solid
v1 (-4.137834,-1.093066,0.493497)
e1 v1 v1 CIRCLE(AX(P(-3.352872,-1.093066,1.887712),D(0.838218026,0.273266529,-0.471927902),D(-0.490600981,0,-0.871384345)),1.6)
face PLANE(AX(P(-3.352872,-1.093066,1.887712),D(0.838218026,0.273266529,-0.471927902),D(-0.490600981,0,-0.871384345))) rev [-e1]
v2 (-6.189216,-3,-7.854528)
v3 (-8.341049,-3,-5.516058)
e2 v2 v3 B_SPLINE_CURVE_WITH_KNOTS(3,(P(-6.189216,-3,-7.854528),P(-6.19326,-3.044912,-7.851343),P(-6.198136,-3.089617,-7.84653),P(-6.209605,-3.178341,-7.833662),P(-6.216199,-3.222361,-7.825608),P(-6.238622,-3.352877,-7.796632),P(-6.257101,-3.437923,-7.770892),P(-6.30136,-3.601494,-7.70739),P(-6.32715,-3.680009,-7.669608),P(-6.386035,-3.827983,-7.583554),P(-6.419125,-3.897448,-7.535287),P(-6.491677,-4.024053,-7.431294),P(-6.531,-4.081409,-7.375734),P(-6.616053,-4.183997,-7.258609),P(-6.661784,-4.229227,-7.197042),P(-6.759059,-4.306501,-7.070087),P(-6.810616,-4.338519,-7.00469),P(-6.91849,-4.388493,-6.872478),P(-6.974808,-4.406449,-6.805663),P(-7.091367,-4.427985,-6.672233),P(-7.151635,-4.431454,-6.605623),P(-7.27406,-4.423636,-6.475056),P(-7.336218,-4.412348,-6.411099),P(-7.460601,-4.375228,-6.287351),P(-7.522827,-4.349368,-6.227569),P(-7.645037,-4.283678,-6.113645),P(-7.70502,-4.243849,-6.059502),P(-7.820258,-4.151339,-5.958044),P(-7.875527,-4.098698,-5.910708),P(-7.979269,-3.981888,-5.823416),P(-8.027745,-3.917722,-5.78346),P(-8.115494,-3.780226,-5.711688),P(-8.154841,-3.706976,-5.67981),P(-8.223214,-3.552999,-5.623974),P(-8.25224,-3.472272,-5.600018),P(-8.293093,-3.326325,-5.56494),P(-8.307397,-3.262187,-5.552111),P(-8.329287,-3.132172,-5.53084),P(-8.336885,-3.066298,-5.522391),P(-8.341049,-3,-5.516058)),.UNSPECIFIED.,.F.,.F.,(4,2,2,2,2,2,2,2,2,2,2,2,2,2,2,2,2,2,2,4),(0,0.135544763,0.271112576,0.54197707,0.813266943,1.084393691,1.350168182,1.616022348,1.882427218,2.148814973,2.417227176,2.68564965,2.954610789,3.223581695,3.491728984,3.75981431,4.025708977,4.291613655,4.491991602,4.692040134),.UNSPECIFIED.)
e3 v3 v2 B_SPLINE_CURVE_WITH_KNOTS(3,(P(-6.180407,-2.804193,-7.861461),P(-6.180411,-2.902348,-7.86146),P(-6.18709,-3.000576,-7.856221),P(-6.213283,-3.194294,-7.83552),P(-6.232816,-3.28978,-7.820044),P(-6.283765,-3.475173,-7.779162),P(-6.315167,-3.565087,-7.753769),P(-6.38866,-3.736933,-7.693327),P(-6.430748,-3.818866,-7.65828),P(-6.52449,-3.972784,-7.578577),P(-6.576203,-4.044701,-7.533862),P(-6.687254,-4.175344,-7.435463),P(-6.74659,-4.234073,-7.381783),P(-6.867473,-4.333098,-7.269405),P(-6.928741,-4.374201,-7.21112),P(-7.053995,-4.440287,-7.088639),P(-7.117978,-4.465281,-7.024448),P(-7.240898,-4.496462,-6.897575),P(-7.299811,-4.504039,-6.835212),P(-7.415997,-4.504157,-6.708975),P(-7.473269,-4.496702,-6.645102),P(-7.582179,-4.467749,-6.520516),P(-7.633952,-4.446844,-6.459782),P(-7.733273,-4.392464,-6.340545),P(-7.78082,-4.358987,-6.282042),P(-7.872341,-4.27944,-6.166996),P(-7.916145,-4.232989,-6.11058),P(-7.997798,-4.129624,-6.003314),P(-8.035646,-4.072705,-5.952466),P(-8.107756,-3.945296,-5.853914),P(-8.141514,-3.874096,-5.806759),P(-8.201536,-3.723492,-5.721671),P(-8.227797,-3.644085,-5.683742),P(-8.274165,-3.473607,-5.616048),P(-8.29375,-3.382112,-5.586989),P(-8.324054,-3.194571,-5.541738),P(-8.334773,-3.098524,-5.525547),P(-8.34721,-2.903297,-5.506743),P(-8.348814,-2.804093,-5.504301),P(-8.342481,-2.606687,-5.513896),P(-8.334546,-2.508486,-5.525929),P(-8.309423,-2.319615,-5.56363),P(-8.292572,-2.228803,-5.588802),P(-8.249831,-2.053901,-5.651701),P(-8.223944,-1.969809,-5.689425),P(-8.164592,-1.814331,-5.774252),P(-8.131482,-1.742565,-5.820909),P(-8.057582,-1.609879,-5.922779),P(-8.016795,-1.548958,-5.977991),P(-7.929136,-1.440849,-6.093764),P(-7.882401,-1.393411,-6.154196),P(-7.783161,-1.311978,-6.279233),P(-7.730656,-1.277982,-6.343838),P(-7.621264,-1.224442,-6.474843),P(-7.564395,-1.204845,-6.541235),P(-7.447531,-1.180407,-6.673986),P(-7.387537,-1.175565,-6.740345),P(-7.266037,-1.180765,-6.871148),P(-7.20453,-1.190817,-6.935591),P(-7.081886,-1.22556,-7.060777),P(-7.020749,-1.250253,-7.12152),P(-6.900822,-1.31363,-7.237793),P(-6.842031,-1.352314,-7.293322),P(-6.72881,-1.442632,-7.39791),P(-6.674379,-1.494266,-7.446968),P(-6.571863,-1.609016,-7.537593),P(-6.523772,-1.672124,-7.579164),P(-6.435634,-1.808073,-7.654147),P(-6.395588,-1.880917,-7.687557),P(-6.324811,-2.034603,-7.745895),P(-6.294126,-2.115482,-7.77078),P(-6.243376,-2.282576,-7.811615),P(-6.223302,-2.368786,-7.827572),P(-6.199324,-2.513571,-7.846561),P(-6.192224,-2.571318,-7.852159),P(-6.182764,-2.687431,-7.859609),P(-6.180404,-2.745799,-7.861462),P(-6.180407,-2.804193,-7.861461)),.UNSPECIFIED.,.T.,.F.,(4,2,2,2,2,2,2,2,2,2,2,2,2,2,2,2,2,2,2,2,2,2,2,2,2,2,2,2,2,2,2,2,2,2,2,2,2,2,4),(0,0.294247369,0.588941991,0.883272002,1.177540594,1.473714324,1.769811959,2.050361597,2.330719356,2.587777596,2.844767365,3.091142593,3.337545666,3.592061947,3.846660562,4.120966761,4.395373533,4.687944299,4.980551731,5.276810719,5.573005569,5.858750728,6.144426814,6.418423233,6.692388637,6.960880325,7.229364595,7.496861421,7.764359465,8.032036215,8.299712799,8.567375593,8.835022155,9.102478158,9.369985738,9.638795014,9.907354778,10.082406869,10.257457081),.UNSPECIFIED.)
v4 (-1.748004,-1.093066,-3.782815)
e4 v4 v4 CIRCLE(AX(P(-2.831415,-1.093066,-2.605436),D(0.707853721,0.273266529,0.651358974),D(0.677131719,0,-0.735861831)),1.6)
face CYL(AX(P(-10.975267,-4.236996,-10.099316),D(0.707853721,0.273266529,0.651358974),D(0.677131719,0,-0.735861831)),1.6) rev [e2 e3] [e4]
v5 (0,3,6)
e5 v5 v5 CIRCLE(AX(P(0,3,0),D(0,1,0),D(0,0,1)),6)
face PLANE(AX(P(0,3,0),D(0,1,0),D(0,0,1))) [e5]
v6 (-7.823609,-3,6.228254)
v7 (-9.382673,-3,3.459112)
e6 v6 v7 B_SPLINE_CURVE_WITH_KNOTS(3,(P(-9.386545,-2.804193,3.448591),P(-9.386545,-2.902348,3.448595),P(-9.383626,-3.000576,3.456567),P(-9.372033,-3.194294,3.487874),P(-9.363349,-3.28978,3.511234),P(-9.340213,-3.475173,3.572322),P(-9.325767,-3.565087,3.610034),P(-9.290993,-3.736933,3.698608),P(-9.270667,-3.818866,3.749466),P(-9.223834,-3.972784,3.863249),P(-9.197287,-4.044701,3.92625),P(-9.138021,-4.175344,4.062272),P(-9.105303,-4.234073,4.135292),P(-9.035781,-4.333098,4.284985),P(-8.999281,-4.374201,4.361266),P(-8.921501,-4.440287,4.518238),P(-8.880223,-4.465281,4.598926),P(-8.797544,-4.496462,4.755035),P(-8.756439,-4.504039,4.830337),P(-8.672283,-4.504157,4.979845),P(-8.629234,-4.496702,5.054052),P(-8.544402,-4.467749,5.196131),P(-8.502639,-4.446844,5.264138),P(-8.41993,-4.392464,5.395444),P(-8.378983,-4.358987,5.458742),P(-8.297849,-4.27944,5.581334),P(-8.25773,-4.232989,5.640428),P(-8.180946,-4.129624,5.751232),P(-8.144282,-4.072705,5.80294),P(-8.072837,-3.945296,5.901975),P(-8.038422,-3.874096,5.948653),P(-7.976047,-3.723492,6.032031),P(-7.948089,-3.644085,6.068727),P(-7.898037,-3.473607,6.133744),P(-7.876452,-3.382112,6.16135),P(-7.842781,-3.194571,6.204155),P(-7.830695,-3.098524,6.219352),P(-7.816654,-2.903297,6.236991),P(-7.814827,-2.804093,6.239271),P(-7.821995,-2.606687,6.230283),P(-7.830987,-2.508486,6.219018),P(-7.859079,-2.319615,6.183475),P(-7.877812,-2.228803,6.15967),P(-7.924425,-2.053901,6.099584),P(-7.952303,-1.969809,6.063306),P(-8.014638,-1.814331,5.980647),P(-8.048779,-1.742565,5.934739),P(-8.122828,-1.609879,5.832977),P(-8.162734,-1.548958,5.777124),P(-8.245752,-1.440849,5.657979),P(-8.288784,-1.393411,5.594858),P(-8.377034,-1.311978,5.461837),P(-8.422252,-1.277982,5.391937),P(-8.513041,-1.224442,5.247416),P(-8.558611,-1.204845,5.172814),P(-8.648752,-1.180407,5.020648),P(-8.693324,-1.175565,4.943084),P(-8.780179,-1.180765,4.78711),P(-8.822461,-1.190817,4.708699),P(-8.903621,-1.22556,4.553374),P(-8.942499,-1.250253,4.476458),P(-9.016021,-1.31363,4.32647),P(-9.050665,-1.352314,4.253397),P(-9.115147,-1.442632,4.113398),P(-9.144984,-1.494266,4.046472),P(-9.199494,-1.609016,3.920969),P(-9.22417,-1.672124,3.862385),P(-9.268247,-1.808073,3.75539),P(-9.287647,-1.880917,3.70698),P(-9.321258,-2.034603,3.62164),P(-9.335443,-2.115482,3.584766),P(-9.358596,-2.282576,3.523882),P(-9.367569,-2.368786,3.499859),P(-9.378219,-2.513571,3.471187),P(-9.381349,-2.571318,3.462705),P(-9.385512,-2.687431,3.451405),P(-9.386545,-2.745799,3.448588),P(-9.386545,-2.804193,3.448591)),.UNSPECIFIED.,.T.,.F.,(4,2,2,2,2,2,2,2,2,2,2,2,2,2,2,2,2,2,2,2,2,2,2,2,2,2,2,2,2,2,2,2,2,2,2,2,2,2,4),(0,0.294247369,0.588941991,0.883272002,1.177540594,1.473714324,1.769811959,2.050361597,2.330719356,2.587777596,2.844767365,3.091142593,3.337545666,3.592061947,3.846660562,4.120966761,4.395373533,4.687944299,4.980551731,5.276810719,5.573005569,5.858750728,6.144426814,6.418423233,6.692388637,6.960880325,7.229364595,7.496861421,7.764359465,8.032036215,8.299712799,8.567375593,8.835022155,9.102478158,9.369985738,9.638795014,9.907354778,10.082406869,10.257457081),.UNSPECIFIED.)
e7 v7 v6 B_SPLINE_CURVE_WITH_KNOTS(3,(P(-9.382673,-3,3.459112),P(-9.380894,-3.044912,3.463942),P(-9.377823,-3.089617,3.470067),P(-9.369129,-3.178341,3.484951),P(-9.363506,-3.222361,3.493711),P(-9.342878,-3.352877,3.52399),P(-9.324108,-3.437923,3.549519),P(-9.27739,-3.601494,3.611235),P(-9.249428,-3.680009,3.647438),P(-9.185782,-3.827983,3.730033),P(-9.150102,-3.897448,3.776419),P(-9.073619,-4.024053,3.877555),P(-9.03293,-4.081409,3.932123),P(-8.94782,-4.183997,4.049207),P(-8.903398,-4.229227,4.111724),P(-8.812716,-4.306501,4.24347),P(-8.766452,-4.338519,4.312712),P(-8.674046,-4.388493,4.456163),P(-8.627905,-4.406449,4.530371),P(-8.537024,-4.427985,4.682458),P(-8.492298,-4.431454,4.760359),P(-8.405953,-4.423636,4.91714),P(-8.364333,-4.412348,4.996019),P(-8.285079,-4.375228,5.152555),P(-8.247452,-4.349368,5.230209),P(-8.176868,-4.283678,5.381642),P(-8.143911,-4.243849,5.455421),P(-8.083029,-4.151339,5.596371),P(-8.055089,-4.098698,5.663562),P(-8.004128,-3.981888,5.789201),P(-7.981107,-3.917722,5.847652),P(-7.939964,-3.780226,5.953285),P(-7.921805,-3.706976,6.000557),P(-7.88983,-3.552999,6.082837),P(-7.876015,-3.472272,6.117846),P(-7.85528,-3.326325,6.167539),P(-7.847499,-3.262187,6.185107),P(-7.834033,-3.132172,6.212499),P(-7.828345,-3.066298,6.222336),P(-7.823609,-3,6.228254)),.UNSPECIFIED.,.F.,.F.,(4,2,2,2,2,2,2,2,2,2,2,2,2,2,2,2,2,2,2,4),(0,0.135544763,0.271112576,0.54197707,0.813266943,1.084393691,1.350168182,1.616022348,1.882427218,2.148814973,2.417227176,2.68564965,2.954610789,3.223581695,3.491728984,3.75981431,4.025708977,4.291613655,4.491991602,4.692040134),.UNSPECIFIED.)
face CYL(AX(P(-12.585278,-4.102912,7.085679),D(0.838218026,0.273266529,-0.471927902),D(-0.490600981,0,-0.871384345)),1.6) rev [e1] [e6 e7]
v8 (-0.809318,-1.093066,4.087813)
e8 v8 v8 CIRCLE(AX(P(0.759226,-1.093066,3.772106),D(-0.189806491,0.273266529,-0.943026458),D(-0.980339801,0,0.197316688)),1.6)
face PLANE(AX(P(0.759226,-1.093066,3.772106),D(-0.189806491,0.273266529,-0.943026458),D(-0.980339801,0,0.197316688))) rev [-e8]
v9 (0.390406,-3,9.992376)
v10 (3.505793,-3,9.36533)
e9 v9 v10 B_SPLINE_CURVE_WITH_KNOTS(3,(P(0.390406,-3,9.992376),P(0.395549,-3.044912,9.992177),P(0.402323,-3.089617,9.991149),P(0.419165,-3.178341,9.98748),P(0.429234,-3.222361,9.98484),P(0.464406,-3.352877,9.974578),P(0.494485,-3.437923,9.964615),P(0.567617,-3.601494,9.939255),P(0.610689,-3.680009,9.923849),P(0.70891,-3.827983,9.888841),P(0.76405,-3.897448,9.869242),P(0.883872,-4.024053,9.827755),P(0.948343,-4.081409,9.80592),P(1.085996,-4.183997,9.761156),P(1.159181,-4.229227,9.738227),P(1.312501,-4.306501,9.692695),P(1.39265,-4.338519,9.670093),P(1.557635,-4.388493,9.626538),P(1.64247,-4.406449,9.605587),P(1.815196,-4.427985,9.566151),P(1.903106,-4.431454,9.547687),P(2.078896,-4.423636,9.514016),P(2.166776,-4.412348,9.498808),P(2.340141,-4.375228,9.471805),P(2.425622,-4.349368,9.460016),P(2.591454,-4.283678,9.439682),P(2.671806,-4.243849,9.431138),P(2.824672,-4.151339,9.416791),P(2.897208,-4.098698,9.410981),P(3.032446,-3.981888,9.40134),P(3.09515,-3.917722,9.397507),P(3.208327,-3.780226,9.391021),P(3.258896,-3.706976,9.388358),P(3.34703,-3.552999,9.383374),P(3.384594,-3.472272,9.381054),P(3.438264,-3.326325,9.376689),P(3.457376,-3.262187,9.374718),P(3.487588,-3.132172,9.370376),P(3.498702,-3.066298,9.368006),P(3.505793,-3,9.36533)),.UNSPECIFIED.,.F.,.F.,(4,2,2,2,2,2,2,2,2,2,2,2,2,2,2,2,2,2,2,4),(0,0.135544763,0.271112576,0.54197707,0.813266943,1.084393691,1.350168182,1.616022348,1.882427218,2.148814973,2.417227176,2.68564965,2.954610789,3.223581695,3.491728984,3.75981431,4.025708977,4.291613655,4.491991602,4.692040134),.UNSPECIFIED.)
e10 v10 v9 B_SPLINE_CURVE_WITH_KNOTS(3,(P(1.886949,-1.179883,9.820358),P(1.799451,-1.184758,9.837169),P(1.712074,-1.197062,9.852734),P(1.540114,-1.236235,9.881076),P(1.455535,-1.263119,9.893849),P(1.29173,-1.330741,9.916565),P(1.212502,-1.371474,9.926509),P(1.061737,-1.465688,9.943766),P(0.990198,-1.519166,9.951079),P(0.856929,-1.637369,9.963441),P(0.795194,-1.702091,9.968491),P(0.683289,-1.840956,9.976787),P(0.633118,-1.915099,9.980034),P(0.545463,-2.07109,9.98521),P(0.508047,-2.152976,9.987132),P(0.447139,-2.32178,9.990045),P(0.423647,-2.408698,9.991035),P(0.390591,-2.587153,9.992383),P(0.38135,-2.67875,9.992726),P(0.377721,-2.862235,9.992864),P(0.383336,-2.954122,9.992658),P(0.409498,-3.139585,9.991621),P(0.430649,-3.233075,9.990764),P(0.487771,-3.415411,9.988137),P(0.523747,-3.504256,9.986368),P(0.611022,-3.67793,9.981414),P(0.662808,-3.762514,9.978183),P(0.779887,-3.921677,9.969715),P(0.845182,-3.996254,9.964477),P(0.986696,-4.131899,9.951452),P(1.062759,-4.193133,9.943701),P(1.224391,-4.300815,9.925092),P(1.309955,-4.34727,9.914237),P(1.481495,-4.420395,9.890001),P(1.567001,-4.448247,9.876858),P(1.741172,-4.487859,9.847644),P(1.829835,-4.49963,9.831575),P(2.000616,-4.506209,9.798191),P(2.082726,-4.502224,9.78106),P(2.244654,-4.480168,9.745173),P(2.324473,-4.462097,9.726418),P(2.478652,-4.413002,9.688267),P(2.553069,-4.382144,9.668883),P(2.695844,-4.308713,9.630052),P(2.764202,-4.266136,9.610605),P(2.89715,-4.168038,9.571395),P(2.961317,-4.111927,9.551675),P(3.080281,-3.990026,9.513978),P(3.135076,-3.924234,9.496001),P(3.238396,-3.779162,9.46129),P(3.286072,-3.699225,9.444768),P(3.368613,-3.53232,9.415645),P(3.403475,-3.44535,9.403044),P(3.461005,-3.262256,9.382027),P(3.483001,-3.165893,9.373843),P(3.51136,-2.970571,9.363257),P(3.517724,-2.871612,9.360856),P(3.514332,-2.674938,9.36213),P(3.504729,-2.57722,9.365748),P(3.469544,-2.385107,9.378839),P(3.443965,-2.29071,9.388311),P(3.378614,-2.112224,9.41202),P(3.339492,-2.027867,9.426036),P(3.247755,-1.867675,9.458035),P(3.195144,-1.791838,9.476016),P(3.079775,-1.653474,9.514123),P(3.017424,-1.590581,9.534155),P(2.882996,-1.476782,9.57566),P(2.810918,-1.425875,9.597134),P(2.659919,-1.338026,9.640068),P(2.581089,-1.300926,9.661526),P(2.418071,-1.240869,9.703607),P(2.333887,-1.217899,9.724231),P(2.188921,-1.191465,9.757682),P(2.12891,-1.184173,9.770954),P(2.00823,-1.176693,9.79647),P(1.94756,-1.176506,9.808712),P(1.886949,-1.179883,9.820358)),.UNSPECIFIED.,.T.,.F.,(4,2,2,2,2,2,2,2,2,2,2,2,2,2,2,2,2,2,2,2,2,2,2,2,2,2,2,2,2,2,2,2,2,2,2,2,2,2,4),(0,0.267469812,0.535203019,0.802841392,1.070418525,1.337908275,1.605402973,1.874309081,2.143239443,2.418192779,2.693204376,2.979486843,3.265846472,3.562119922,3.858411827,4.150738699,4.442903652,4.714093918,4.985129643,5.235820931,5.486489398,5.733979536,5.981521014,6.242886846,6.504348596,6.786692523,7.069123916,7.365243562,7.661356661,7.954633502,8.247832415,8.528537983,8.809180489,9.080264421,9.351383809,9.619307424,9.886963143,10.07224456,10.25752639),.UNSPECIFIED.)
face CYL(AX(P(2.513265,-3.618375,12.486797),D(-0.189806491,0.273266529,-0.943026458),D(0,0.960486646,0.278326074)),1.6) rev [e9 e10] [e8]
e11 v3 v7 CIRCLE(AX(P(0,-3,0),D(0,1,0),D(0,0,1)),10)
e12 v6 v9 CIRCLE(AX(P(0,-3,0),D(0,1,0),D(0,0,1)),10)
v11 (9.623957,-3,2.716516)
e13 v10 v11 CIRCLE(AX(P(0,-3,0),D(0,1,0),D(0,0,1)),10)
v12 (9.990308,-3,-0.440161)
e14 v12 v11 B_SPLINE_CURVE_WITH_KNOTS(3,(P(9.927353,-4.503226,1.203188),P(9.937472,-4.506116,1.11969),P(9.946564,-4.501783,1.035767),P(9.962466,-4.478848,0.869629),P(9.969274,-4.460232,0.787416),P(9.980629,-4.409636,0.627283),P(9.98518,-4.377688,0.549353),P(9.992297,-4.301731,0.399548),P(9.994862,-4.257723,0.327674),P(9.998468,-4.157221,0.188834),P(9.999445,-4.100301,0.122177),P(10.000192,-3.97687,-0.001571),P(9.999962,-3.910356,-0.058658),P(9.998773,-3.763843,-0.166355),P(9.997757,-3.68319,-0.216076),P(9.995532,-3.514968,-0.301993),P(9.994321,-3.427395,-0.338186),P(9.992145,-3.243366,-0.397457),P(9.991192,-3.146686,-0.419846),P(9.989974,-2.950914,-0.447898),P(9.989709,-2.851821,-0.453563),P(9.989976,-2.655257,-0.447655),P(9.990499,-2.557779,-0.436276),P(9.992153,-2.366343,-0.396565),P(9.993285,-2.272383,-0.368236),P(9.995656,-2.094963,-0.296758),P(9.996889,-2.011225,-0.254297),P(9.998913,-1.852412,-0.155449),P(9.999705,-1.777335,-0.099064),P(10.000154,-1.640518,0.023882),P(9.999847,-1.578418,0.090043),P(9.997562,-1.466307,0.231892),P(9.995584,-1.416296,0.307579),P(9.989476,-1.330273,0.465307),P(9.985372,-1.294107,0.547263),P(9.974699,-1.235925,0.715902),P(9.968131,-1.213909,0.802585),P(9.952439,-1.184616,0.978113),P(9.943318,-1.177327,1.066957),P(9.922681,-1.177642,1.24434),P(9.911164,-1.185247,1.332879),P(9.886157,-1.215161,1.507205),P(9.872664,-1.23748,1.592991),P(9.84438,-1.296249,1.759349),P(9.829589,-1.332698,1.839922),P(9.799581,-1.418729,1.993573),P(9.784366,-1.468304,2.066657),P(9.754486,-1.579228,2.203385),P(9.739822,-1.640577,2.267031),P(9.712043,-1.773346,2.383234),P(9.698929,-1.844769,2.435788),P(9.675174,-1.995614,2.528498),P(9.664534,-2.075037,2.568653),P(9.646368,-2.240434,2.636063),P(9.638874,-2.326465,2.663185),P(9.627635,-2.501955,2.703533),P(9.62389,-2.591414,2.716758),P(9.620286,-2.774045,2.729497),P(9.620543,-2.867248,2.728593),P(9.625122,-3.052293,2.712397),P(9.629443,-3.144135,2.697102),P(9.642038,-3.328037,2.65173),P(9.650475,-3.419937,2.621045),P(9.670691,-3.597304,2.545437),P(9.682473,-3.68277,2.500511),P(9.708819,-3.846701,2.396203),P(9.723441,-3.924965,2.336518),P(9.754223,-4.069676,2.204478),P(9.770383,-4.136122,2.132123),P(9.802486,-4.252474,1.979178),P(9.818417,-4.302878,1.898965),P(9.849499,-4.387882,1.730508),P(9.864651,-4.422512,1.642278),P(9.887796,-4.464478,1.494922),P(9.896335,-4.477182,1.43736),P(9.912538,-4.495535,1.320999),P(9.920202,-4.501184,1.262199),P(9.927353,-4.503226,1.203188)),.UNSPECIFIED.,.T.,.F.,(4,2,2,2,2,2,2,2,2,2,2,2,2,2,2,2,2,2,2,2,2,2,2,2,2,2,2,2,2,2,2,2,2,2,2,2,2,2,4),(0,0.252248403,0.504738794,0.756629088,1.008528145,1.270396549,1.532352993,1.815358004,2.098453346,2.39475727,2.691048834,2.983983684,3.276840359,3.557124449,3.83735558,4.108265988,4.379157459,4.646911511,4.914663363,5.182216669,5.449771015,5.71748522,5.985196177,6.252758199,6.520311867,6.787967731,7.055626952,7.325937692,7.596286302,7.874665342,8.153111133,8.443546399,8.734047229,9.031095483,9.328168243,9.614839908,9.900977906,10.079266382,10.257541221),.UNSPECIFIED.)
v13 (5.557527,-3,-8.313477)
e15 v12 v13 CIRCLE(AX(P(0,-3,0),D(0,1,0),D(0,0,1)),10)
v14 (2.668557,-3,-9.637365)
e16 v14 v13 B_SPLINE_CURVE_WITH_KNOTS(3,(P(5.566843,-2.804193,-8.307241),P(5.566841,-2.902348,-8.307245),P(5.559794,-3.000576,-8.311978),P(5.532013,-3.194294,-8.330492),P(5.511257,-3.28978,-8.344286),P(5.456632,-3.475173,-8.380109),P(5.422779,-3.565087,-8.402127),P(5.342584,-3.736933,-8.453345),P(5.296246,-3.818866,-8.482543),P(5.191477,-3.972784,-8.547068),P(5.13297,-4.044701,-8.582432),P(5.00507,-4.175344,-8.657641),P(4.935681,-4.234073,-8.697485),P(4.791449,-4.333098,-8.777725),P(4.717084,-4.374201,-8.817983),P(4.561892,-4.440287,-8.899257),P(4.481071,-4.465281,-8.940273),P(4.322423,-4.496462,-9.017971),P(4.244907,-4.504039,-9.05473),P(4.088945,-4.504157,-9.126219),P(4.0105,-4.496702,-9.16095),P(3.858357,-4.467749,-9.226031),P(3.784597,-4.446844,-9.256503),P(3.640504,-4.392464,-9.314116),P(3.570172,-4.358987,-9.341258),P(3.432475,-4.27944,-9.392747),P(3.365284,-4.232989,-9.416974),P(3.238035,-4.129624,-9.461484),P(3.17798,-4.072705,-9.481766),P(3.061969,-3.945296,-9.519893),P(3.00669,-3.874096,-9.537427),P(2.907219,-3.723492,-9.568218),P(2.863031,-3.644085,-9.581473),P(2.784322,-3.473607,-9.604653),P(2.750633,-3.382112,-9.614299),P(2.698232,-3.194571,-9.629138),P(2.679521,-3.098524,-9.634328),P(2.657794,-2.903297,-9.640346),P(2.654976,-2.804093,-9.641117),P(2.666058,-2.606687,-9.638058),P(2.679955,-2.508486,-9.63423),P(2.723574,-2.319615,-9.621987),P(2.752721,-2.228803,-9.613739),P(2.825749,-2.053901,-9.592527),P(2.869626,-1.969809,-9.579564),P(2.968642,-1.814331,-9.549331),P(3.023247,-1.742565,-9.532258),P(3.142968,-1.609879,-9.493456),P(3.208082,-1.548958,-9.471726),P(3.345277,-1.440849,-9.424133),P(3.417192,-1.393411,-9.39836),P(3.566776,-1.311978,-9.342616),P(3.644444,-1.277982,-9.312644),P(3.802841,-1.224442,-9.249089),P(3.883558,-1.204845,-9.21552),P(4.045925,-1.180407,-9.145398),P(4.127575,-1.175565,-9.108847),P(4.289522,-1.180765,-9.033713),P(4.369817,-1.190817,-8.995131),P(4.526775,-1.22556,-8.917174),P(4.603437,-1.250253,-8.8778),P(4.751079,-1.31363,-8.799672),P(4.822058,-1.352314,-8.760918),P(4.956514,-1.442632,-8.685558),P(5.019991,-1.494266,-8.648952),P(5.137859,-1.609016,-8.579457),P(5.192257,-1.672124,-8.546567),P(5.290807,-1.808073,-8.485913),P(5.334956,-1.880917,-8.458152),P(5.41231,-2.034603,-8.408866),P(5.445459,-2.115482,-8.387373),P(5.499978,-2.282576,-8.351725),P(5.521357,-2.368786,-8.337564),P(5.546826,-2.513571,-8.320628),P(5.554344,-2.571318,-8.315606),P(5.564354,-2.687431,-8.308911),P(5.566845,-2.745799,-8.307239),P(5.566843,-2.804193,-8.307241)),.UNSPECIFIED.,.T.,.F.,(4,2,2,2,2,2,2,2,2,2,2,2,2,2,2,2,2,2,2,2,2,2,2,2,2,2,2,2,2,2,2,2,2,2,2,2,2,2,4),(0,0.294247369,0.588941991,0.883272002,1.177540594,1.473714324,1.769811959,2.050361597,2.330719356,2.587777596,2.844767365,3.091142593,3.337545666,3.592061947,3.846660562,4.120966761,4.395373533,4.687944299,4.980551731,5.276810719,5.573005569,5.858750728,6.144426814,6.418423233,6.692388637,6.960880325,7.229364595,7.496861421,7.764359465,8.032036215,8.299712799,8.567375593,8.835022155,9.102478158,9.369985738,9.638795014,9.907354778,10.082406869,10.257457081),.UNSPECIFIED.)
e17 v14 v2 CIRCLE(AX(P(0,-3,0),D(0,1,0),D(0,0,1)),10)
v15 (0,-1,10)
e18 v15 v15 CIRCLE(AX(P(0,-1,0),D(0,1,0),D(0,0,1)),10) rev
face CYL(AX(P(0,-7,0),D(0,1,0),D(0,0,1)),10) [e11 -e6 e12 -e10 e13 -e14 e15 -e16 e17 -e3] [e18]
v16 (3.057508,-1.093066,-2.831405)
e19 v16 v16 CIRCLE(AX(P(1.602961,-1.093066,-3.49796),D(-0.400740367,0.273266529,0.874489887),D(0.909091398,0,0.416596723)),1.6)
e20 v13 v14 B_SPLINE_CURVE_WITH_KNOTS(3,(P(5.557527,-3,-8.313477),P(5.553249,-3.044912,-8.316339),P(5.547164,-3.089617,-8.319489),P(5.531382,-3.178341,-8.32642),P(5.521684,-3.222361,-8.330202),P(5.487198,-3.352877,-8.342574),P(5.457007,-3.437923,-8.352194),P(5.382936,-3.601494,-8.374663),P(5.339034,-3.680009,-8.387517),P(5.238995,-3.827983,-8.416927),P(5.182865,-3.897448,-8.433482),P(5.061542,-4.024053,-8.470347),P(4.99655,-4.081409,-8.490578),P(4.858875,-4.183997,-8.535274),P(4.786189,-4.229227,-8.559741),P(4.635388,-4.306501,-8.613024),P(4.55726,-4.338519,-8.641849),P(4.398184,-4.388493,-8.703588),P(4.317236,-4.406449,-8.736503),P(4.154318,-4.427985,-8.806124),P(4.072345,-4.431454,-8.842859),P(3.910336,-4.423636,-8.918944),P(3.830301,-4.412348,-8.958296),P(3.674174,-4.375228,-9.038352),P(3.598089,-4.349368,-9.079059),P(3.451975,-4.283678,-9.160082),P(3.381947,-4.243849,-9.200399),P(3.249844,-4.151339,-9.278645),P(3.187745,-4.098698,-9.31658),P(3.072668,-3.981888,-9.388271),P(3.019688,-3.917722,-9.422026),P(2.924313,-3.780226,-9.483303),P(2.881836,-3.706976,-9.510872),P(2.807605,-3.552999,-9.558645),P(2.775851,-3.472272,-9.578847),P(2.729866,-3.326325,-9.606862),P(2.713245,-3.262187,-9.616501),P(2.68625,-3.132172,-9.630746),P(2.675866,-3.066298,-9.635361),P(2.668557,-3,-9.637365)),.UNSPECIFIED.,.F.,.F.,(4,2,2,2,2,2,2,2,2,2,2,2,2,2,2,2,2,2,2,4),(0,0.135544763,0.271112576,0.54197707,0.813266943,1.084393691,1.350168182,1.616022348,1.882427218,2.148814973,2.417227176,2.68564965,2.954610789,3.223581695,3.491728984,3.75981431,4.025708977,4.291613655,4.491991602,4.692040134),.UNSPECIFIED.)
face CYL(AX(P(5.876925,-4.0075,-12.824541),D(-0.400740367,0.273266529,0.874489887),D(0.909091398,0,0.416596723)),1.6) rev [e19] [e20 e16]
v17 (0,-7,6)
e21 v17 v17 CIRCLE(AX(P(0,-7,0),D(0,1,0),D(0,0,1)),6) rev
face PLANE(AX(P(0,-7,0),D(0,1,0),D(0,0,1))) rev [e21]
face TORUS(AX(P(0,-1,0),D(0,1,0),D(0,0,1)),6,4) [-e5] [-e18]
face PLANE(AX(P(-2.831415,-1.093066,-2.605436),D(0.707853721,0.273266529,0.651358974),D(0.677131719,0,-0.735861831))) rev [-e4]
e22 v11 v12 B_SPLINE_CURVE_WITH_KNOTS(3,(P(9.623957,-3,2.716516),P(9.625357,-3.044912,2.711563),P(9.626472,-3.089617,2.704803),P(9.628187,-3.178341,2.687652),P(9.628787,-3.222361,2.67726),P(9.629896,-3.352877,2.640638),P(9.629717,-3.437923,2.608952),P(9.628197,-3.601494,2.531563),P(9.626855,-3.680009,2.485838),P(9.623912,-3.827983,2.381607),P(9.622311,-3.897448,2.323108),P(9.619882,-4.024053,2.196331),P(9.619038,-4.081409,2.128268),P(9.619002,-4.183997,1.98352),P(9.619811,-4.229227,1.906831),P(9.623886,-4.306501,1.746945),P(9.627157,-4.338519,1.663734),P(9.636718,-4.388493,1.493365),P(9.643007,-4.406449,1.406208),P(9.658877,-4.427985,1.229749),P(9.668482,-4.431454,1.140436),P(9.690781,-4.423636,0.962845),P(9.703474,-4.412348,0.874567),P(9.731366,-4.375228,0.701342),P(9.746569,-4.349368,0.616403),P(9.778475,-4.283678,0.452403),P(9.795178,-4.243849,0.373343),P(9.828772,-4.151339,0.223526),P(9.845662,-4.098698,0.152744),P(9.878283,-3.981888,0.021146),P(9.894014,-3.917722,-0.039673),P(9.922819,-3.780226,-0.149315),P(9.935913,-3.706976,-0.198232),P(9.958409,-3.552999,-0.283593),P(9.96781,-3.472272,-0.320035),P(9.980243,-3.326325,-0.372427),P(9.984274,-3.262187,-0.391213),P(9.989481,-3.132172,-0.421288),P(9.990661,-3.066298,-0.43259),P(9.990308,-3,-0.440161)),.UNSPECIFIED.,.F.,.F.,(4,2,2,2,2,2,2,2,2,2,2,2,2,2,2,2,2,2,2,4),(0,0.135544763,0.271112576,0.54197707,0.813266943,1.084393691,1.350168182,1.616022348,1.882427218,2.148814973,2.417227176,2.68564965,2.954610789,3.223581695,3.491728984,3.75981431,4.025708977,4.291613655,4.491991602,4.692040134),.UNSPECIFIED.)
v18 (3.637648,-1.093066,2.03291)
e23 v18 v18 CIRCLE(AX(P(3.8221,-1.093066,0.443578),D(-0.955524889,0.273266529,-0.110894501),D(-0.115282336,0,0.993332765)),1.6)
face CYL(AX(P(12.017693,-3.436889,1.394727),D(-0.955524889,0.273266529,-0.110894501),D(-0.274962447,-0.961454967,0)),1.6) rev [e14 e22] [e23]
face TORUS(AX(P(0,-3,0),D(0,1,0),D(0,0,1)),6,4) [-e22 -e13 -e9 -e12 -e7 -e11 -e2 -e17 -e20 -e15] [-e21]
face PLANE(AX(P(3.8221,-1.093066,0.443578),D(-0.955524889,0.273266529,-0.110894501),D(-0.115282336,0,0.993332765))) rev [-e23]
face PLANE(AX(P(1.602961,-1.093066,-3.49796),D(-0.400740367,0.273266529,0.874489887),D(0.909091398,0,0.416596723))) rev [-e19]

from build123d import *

# Parameters (mm, degrees)
BOSS_EXTRUDE1_DEPTH      = 3
BOSS_EXTRUDE1_DEPTH_BACK = 7
SKETCH1_R                = 10
SKETCH4_R                = 1.6
HOLE_DEPTH               = 19.828402711
HOLECIR_COUNT            = 5
FILLET2_R                = 4


with BuildPart() as part:
    # Sketch1 → Boss-Extrude1 (new, two sides: drawn at the far end of the back side and taken through both)
    with BuildSketch(Plane(origin=(0, 0, 0), x_dir=(1, 0, 0), z_dir=(0, 1, 0)).offset(-BOSS_EXTRUDE1_DEPTH_BACK)):
        with Locations(Location((0, 0, 0), (0, 0, 270))):
            Circle(SKETCH1_R)
    extrude(amount=BOSS_EXTRUDE1_DEPTH + BOSS_EXTRUDE1_DEPTH_BACK)

    # Sketch4 → hole (cut, through all)
    with BuildSketch(Plane(origin=(-3.352872105, -1.093066116, 1.887711608), x_dir=(-0.4486862613641547, -0.14627571033740308, -0.8816371449912632), z_dir=(0.8382180262940947, 0.2732665289126682, -0.47192790187872385))):
        with Locations(Location((0, 0, 0), (0, 0, 8.746528197))):
            Circle(SKETCH4_R)
    hole = extrude(amount=-HOLE_DEPTH, mode=Mode.SUBTRACT)

    # holecir: hole ×5 about axis
    holecir_axis = Axis((0, 0, 0), (0, 1, 0))
    for i in range(1, HOLECIR_COUNT):
        add(hole.rotate(holecir_axis, i * 360 / HOLECIR_COUNT), mode=Mode.SUBTRACT)

    # Fillet2
    # the kernel refuses this fillet: 4 mm, written as the material it takes off along each edge
    with BuildSketch(Plane(origin=(0, -7, 0), x_dir=(0, 0, 1), z_dir=(-1, 0, 0))) as fillet2_piece_1:
        with BuildLine():
            CenterArc((10 - FILLET2_R, FILLET2_R), FILLET2_R, 270, 90)
            Line((10 - FILLET2_R, 0), (10, 0))
            Line((10, 0), (10, FILLET2_R))
        make_face()
    revolve(axis=Axis((0, -7, 0), (0, 1, 0)), mode=Mode.SUBTRACT)
    with BuildSketch(Plane(origin=(0, 3, 0), x_dir=(0, 0, 1), z_dir=(-1, 0, 0))) as fillet2_piece_2:
        with BuildLine():
            CenterArc((10 - FILLET2_R, -FILLET2_R), FILLET2_R, 0, 90)
            Line((10 - FILLET2_R, 0), (10, 0))
            Line((10, 0), (10, -FILLET2_R))
        make_face()
    revolve(axis=Axis((0, 3, 0), (0, 1, 0)), mode=Mode.SUBTRACT)


solid = part.part
